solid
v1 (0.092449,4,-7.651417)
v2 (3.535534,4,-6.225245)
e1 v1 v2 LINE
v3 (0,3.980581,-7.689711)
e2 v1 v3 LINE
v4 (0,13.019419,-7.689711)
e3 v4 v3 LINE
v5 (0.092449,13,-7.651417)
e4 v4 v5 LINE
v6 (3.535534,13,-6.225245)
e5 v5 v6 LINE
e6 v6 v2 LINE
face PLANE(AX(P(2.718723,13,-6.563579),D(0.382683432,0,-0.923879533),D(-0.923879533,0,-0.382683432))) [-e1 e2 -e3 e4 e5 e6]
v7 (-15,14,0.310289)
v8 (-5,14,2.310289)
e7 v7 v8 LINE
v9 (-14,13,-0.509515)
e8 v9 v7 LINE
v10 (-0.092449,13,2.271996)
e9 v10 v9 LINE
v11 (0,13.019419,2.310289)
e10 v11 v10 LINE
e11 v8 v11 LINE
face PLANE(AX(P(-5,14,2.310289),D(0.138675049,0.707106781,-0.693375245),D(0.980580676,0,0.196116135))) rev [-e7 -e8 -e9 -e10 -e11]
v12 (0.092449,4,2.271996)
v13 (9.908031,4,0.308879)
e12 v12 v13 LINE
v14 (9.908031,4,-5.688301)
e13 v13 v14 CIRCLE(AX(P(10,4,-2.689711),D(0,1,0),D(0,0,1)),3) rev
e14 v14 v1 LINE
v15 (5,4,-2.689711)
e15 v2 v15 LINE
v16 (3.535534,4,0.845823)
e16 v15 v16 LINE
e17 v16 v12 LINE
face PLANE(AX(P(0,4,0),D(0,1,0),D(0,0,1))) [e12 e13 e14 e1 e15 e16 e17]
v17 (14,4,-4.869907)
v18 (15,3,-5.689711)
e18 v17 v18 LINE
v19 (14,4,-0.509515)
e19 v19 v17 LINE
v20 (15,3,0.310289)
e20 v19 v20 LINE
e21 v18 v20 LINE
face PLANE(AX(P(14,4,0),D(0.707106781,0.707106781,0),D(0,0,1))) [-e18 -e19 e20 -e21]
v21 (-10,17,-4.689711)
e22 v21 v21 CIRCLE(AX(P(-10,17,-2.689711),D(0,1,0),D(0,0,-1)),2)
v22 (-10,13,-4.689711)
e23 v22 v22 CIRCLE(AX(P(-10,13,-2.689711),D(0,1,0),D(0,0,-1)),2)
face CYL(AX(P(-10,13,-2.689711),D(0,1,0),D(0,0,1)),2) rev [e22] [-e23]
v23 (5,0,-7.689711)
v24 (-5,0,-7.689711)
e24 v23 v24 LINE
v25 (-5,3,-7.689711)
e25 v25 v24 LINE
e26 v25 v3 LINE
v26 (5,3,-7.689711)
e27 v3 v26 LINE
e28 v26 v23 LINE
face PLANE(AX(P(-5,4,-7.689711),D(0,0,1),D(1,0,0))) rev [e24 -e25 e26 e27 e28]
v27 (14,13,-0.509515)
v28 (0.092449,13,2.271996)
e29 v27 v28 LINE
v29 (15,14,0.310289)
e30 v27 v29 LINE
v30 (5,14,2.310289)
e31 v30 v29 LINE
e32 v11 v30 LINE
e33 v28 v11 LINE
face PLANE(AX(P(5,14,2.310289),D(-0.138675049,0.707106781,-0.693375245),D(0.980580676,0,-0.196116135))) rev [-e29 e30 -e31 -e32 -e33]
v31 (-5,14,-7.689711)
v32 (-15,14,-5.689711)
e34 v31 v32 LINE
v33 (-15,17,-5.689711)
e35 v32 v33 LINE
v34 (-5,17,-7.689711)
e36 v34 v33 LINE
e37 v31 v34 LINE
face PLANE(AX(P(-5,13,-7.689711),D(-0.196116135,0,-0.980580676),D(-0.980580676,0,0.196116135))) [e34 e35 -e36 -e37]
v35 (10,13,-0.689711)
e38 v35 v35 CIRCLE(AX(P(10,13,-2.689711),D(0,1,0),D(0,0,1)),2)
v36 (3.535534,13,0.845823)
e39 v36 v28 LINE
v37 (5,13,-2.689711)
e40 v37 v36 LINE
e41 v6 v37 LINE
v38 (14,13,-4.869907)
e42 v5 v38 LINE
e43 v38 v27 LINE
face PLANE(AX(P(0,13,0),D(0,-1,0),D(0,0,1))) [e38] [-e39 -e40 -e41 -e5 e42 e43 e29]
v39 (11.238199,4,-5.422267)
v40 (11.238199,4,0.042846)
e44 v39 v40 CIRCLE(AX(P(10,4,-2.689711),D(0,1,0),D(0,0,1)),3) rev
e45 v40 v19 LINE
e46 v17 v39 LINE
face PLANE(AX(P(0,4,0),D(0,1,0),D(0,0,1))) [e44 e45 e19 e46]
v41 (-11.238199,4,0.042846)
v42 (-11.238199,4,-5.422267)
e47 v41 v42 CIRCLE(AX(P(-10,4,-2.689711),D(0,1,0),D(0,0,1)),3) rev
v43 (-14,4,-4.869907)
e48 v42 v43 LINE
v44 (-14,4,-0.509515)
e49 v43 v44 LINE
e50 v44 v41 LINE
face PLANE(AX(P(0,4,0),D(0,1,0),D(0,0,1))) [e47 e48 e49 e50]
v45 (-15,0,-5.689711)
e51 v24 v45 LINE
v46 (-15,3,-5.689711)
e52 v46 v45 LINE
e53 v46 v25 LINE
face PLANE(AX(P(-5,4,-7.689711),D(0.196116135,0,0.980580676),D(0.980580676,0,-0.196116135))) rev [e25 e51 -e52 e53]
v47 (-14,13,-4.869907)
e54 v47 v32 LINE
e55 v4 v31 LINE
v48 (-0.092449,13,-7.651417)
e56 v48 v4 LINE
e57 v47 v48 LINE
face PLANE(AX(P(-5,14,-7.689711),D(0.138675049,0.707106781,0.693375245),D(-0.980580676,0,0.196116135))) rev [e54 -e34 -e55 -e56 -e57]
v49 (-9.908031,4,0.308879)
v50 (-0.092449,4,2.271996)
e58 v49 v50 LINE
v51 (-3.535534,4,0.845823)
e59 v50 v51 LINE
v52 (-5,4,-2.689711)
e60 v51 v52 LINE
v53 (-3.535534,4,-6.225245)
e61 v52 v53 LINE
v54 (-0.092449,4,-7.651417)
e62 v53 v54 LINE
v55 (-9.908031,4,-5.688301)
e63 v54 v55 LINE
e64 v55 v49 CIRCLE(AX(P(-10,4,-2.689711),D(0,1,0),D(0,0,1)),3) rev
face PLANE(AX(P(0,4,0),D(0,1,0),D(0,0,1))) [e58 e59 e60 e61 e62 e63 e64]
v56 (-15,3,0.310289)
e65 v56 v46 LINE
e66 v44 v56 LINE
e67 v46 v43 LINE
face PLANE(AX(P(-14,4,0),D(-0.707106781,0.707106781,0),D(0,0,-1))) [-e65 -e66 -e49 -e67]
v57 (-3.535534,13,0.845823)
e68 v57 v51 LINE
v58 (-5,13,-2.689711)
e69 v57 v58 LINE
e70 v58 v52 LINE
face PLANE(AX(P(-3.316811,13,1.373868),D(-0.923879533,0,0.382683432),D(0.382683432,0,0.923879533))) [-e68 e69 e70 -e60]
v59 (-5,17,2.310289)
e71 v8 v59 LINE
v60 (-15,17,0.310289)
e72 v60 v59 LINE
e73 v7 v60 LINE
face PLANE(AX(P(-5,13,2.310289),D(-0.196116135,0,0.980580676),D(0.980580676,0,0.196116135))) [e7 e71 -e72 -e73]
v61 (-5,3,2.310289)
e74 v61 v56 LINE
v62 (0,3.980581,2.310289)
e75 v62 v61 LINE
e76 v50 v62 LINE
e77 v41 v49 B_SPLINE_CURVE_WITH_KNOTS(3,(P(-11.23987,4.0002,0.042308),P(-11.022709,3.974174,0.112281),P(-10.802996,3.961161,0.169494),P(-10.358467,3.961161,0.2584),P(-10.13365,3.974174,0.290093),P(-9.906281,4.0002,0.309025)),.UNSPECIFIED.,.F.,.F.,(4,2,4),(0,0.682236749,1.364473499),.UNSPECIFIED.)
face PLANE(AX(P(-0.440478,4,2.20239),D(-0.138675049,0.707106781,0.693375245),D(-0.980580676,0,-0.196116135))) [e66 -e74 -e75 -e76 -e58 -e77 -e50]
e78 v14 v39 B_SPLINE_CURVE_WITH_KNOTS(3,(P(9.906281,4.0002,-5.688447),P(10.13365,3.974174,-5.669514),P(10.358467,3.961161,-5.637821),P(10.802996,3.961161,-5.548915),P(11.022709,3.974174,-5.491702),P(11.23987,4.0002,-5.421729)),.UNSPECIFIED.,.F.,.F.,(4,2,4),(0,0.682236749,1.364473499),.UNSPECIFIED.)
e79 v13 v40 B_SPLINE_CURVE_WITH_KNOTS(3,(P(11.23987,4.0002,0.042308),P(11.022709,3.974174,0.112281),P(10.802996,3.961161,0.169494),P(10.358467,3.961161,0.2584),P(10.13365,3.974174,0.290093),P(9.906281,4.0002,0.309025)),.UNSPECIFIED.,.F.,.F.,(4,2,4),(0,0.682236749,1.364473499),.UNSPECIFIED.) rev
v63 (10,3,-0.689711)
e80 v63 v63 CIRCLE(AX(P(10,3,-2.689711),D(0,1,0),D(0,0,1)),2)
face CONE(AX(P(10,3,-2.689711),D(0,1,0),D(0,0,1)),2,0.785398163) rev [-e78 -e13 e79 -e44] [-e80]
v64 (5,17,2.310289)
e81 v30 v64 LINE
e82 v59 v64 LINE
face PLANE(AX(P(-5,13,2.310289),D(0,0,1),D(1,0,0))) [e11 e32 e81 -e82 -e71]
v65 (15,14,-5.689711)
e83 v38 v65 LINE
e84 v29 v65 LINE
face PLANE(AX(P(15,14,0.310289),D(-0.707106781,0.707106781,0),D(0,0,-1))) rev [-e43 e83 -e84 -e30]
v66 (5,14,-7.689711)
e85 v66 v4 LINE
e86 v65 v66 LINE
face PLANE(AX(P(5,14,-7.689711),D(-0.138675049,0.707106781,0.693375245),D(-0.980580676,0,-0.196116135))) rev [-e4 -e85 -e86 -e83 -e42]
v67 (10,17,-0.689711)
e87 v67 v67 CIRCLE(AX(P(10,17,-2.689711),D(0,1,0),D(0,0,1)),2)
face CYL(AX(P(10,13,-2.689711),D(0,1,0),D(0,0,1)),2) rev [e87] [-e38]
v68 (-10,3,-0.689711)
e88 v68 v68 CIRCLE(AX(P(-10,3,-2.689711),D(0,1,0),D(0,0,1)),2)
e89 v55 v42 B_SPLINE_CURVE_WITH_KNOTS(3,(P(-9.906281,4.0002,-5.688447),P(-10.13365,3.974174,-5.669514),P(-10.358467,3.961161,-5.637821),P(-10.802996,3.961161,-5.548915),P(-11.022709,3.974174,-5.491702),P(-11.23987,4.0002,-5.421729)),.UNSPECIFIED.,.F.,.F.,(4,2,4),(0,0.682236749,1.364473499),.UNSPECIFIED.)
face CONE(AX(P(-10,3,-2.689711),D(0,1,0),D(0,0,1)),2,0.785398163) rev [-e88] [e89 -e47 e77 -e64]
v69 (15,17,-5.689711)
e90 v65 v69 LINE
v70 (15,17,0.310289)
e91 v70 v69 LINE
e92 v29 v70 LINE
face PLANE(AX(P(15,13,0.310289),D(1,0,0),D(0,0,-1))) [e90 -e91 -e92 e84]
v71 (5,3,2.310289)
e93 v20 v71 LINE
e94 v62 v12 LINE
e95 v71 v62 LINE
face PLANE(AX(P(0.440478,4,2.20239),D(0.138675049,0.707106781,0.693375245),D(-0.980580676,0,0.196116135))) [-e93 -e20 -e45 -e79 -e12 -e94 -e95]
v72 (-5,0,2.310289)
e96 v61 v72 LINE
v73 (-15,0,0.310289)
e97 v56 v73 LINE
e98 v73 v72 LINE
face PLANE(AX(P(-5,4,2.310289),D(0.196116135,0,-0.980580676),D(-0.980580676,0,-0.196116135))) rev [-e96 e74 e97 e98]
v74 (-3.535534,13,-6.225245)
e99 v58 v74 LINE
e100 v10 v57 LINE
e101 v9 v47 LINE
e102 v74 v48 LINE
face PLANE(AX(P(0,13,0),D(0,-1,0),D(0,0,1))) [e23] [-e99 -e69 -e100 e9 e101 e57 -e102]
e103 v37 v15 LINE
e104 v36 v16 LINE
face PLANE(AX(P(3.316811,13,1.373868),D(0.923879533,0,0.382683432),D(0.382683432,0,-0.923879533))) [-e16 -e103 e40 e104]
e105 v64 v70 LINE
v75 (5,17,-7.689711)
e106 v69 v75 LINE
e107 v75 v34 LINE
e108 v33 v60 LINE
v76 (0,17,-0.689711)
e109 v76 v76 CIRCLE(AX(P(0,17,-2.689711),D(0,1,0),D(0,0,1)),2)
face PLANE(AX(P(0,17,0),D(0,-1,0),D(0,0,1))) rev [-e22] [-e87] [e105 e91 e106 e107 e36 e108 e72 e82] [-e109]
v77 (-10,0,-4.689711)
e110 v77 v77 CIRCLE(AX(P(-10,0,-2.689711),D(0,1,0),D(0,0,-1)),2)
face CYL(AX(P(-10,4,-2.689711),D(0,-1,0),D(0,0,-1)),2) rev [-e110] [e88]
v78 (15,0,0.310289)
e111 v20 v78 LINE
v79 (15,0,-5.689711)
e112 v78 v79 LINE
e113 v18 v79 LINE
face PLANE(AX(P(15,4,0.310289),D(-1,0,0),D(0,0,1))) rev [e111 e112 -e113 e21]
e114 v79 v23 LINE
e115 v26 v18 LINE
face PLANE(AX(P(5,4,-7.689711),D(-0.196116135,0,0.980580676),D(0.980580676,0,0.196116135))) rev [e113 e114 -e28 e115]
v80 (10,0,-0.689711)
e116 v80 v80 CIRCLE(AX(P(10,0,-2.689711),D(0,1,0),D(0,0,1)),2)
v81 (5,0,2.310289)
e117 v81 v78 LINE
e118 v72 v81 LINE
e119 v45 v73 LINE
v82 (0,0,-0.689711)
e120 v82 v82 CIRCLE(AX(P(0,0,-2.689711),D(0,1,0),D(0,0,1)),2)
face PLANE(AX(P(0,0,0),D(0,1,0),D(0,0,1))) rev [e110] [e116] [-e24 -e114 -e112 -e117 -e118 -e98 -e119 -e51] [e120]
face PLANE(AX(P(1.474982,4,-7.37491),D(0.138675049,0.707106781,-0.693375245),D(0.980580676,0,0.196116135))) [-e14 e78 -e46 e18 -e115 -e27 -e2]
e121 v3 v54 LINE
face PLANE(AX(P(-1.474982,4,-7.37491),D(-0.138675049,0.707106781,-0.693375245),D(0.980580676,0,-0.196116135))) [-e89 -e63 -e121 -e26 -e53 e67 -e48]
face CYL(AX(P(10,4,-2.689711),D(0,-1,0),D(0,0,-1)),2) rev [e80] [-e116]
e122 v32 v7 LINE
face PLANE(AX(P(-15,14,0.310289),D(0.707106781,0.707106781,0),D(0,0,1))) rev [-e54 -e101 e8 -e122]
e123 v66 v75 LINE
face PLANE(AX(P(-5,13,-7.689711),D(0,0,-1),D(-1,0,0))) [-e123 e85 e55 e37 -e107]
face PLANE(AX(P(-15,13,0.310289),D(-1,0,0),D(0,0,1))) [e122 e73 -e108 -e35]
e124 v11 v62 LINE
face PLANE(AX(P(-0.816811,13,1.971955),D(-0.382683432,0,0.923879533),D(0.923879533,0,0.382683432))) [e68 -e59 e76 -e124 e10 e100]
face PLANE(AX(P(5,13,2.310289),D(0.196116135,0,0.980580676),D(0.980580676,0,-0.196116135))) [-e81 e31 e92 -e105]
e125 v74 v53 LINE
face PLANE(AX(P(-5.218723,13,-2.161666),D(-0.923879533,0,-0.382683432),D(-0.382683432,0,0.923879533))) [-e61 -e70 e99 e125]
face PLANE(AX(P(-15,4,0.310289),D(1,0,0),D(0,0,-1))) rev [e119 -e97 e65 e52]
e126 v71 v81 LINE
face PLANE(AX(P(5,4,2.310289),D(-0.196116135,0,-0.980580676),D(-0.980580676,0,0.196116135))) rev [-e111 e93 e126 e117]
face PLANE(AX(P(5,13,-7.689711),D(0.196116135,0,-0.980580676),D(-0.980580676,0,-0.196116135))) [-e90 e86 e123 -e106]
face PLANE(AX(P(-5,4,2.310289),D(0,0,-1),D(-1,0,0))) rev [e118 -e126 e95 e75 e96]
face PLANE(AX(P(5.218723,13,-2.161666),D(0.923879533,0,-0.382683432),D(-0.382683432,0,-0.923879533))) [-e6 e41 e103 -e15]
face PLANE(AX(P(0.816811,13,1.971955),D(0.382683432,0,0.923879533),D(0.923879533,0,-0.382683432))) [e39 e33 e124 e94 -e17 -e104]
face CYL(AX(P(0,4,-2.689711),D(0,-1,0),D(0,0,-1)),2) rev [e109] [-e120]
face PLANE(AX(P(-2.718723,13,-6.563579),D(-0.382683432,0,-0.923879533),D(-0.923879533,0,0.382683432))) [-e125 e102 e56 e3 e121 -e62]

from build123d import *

# Parameters (mm, degrees)
SKETCH1_R               = 2
BOSS_EXTRUDE1_DEPTH     = 4
BOSS_EXTRUDE2_START     = 4
BOSS_EXTRUDE2_DEPTH     = 9
CHAMFER2_SIZE           = 1
CHAMFER3_SIZE           = 1
CUT_EXTRUDE2_DEPTH      = 10
CUT_EXTRUDE2_DEPTH_BACK = 9
SKETCH1_2_R             = 2
SKETCH6_R               = 2
CUT_EXTRUDE3_DEPTH      = 17


with BuildPart() as part:
    # Sketch1 → Boss-Extrude1 (new body)
    with BuildSketch(Plane(origin=(0, 0, 0), x_dir=(1, 0, 0), z_dir=(0, 1, 0))):
        Polygon((-5, -2.310289343), (5, -2.310289343), (15, -0.310289343), (15, 5.689710657), (5, 7.689710657), (-5, 7.689710657), (-15, 5.689710657), (-15, -0.310289343), align=None)
        with Locations(Location((10, 2.689710657, 0), (0, 0, 270))):
            Circle(SKETCH1_R, mode=Mode.SUBTRACT)
        with Locations(Location((0, 2.689710657, 0), (0, 0, 270))):
            Circle(SKETCH1_R, mode=Mode.SUBTRACT)
        with Locations(Location((-10, 2.689710657, 0), (0, 0, 90))):
            Circle(SKETCH1_R, mode=Mode.SUBTRACT)
    boss_extrude1 = extrude(amount=BOSS_EXTRUDE1_DEPTH)

    # Sketch2 → Boss-Extrude2 (add)
    with BuildSketch(Plane(origin=(0, 0, 0), x_dir=(1, 0, 0), z_dir=(0, 1, 0)).offset(BOSS_EXTRUDE2_START)):
        Polygon((0, -2.310289343), (3.535533906, -0.845823249), (5, 2.689710657), (3.535533906, 6.225244563), (0, 7.689710657), (-3.535533906, 6.225244563), (-5, 2.689710657), (-3.535533906, -0.845823249), align=None)
    extrude(amount=BOSS_EXTRUDE2_DEPTH)

    # Mirror1: Boss-Extrude1 across plane
    add(boss_extrude1.mirror(Plane.ZX.offset(8.5)))

    # Chamfer2
    # the kernel refuses this chamfer: 1 mm, written as the material it takes off along each edge
    with BuildSketch(Plane(origin=(17.521742642, 4, -5.185362128), x_dir=(-0.19611613513818452, 0, 0.9805806756909201), z_dir=(-0.9805806756909201, 0, -0.19611613513818454))) as chamfer2_piece_1_section:
        Polygon((CHAMFER2_SIZE, 0), (0, -CHAMFER2_SIZE), (0, 0), align=None)
    chamfer2_piece_1 = extrude(amount=20.484770979, mode=Mode.PRIVATE)
    chamfer2_piece_1 = split(chamfer2_piece_1, bisect_by=Plane(origin=(15.841163755, 4, -1.128085786), z_dir=(0.38268343236508956, 0, -0.9238795325112868)), keep=Keep.TOP, mode=Mode.PRIVATE)
    add(chamfer2_piece_1, mode=Mode.SUBTRACT)
    with BuildSketch(Plane(origin=(15, 4, 2.881972331), x_dir=(-1, 0, 0), z_dir=(0, 0, -1))) as chamfer2_piece_2:
        Polygon((CHAMFER2_SIZE, 0), (0, -CHAMFER2_SIZE), (0, 0), align=None)
    extrude(amount=11.143365976, mode=Mode.SUBTRACT)
    with BuildSketch(Plane(origin=(-2.565227926, 4, 3.823334929), x_dir=(0, -1, 0), z_dir=(0.9805806756909202, 0, -0.19611613513818407))) as chamfer2_piece_3_section:
        Polygon((CHAMFER2_SIZE, 0), (0, CHAMFER2_SIZE), (0, 0), align=None)
    chamfer2_piece_3 = extrude(amount=20.484770979, mode=Mode.PRIVATE)
    chamfer2_piece_3 = split(chamfer2_piece_3, bisect_by=Plane(origin=(-2.724501391, 4, 3.43881477), z_dir=(0.38268343236508995, 0, 0.9238795325112867)), keep=Keep.TOP, mode=Mode.PRIVATE)
    add(chamfer2_piece_3, mode=Mode.SUBTRACT)
    with BuildSketch(Plane(origin=(10, 4, -2.689710657), x_dir=(0, 0, 1), z_dir=(-1, 0, 0))) as chamfer2_piece_4:
        Polygon((2 + CHAMFER2_SIZE, 0), (2, -CHAMFER2_SIZE), (2, 0), align=None)
    revolve(axis=Axis((10, 4, -2.689710657), (0, 1, 0)), mode=Mode.SUBTRACT)
    with BuildSketch(Plane(origin=(-2.565227926, 13, 3.823334929), x_dir=(-0.19611613513818407, 0, -0.9805806756909202), z_dir=(0.9805806756909202, 0, -0.19611613513818407))) as chamfer2_piece_5_section:
        Polygon((CHAMFER2_SIZE, 0), (0, CHAMFER2_SIZE), (0, 0), align=None)
    chamfer2_piece_5 = extrude(amount=20.484770979, mode=Mode.PRIVATE)
    chamfer2_piece_5 = split(chamfer2_piece_5, bisect_by=Plane(origin=(-2.724501391, 13, 3.43881477), z_dir=(0.38268343236508995, 0, 0.9238795325112867)), keep=Keep.TOP, mode=Mode.PRIVATE)
    add(chamfer2_piece_5, mode=Mode.SUBTRACT)
    with BuildSketch(Plane(origin=(17.521742642, 13, -5.185362128), x_dir=(-0.19611613513818452, 0, 0.9805806756909201), z_dir=(-0.9805806756909201, 0, -0.19611613513818454))) as chamfer2_piece_6_section:
        Polygon((CHAMFER2_SIZE, 0), (0, CHAMFER2_SIZE), (0, 0), align=None)
    chamfer2_piece_6 = extrude(amount=20.484770979, mode=Mode.PRIVATE)
    chamfer2_piece_6 = split(chamfer2_piece_6, bisect_by=Plane(origin=(15.841163755, 13, -1.128085786), z_dir=(0.38268343236508956, 0, -0.9238795325112868)), keep=Keep.TOP, mode=Mode.PRIVATE)
    add(chamfer2_piece_6, mode=Mode.SUBTRACT)
    with BuildSketch(Plane(origin=(15, 13, 2.881972331), x_dir=(-1, 0, 0), z_dir=(0, 0, -1))) as chamfer2_piece_7:
        Polygon((CHAMFER2_SIZE, 0), (0, CHAMFER2_SIZE), (0, 0), align=None)
    extrude(amount=11.143365976, mode=Mode.SUBTRACT)

    # Chamfer3
    # the kernel refuses this chamfer: 1 mm, written as the material it takes off along each edge
    with BuildSketch(Plane(origin=(-10, 4, -2.689710657), x_dir=(0, 0, -1), z_dir=(1, 0, 0))) as chamfer3_piece_1:
        Polygon((2 + CHAMFER3_SIZE, 0), (2, -CHAMFER3_SIZE), (2, 0), align=None)
    revolve(axis=Axis((-10, 4, -2.689710657), (0, 1, 0)), mode=Mode.SUBTRACT)
    with BuildSketch(Plane(origin=(2.565227926, 13, -9.202756242), x_dir=(0.19611613513818496, 0, 0.98058067569092), z_dir=(-0.98058067569092, 0, 0.19611613513818493))) as chamfer3_piece_2_section:
        Polygon((CHAMFER3_SIZE, 0), (0, CHAMFER3_SIZE), (0, 0), align=None)
    chamfer3_piece_2 = extrude(amount=20.484770979, mode=Mode.PRIVATE)
    chamfer3_piece_2 = split(chamfer3_piece_2, bisect_by=Plane(origin=(2.724501391, 13, -8.818236083), z_dir=(-0.38268343236509006, 0, -0.9238795325112867)), keep=Keep.TOP, mode=Mode.PRIVATE)
    add(chamfer3_piece_2, mode=Mode.SUBTRACT)
    with BuildSketch(Plane(origin=(-15, 13, -8.261393645), x_dir=(1, 0, 0), z_dir=(0, 0, 1))) as chamfer3_piece_3:
        Polygon((CHAMFER3_SIZE, 0), (0, CHAMFER3_SIZE), (0, 0), align=None)
    extrude(amount=11.143365976, mode=Mode.SUBTRACT)
    with BuildSketch(Plane(origin=(-17.521742642, 13, -0.194059185), x_dir=(0.19611613513818402, 0, -0.9805806756909202), z_dir=(0.9805806756909202, 0, 0.19611613513818402))) as chamfer3_piece_4_section:
        Polygon((CHAMFER3_SIZE, 0), (0, CHAMFER3_SIZE), (0, 0), align=None)
    chamfer3_piece_4 = extrude(amount=20.484770979, mode=Mode.PRIVATE)
    chamfer3_piece_4 = split(chamfer3_piece_4, bisect_by=Plane(origin=(-15.841163755, 13, -4.251335528), z_dir=(-0.3826834323650897, 0, 0.9238795325112868)), keep=Keep.TOP, mode=Mode.PRIVATE)
    add(chamfer3_piece_4, mode=Mode.SUBTRACT)
    with BuildSketch(Plane(origin=(2.565227926, 4, -9.202756242), x_dir=(0.19611613513818496, 0, 0.98058067569092), z_dir=(-0.98058067569092, 0, 0.19611613513818493))) as chamfer3_piece_5_section:
        Polygon((CHAMFER3_SIZE, 0), (0, -CHAMFER3_SIZE), (0, 0), align=None)
    chamfer3_piece_5 = extrude(amount=20.484770979, mode=Mode.PRIVATE)
    chamfer3_piece_5 = split(chamfer3_piece_5, bisect_by=Plane(origin=(2.724501391, 4, -8.818236083), z_dir=(-0.38268343236509006, 0, -0.9238795325112867)), keep=Keep.TOP, mode=Mode.PRIVATE)
    add(chamfer3_piece_5, mode=Mode.SUBTRACT)
    with BuildSketch(Plane(origin=(-15, 4, -8.261393645), x_dir=(1, 0, 0), z_dir=(0, 0, 1))) as chamfer3_piece_6:
        Polygon((CHAMFER3_SIZE, 0), (0, -CHAMFER3_SIZE), (0, 0), align=None)
    extrude(amount=11.143365976, mode=Mode.SUBTRACT)
    with BuildSketch(Plane(origin=(-17.521742642, 4, -0.194059185), x_dir=(0.19611613513818402, 0, -0.9805806756909202), z_dir=(0.9805806756909202, 0, 0.19611613513818402))) as chamfer3_piece_7_section:
        Polygon((CHAMFER3_SIZE, 0), (0, -CHAMFER3_SIZE), (0, 0), align=None)
    chamfer3_piece_7 = extrude(amount=20.484770979, mode=Mode.PRIVATE)
    chamfer3_piece_7 = split(chamfer3_piece_7, bisect_by=Plane(origin=(-15.841163755, 4, -4.251335528), z_dir=(-0.3826834323650897, 0, 0.9238795325112868)), keep=Keep.TOP, mode=Mode.PRIVATE)
    add(chamfer3_piece_7, mode=Mode.SUBTRACT)

    # Sketch1<2> → Cut-Extrude2 (cut, two sides: drawn at the far end of the back side and taken through both)
    with BuildSketch(Plane(origin=(0, 0, 0), x_dir=(1, 0, 0), z_dir=(0, 1, 0)).offset(-CUT_EXTRUDE2_DEPTH_BACK)):
        with Locations(Location((0, 2.689710657, 0), (0, 0, 270))):
            Circle(SKETCH1_2_R)
    extrude(amount=CUT_EXTRUDE2_DEPTH + CUT_EXTRUDE2_DEPTH_BACK, mode=Mode.SUBTRACT)

    # Sketch6 → Cut-Extrude3 (cut)
    with BuildSketch(Plane(origin=(0, 13, 0), x_dir=(1, 0, 0), z_dir=(0, 1, 0))):
        with Locations(Location((0, 2.689710657, 0), (0, 0, 270))):
            Circle(SKETCH6_R)
    extrude(amount=-CUT_EXTRUDE3_DEPTH, mode=Mode.SUBTRACT)


solid = part.part
